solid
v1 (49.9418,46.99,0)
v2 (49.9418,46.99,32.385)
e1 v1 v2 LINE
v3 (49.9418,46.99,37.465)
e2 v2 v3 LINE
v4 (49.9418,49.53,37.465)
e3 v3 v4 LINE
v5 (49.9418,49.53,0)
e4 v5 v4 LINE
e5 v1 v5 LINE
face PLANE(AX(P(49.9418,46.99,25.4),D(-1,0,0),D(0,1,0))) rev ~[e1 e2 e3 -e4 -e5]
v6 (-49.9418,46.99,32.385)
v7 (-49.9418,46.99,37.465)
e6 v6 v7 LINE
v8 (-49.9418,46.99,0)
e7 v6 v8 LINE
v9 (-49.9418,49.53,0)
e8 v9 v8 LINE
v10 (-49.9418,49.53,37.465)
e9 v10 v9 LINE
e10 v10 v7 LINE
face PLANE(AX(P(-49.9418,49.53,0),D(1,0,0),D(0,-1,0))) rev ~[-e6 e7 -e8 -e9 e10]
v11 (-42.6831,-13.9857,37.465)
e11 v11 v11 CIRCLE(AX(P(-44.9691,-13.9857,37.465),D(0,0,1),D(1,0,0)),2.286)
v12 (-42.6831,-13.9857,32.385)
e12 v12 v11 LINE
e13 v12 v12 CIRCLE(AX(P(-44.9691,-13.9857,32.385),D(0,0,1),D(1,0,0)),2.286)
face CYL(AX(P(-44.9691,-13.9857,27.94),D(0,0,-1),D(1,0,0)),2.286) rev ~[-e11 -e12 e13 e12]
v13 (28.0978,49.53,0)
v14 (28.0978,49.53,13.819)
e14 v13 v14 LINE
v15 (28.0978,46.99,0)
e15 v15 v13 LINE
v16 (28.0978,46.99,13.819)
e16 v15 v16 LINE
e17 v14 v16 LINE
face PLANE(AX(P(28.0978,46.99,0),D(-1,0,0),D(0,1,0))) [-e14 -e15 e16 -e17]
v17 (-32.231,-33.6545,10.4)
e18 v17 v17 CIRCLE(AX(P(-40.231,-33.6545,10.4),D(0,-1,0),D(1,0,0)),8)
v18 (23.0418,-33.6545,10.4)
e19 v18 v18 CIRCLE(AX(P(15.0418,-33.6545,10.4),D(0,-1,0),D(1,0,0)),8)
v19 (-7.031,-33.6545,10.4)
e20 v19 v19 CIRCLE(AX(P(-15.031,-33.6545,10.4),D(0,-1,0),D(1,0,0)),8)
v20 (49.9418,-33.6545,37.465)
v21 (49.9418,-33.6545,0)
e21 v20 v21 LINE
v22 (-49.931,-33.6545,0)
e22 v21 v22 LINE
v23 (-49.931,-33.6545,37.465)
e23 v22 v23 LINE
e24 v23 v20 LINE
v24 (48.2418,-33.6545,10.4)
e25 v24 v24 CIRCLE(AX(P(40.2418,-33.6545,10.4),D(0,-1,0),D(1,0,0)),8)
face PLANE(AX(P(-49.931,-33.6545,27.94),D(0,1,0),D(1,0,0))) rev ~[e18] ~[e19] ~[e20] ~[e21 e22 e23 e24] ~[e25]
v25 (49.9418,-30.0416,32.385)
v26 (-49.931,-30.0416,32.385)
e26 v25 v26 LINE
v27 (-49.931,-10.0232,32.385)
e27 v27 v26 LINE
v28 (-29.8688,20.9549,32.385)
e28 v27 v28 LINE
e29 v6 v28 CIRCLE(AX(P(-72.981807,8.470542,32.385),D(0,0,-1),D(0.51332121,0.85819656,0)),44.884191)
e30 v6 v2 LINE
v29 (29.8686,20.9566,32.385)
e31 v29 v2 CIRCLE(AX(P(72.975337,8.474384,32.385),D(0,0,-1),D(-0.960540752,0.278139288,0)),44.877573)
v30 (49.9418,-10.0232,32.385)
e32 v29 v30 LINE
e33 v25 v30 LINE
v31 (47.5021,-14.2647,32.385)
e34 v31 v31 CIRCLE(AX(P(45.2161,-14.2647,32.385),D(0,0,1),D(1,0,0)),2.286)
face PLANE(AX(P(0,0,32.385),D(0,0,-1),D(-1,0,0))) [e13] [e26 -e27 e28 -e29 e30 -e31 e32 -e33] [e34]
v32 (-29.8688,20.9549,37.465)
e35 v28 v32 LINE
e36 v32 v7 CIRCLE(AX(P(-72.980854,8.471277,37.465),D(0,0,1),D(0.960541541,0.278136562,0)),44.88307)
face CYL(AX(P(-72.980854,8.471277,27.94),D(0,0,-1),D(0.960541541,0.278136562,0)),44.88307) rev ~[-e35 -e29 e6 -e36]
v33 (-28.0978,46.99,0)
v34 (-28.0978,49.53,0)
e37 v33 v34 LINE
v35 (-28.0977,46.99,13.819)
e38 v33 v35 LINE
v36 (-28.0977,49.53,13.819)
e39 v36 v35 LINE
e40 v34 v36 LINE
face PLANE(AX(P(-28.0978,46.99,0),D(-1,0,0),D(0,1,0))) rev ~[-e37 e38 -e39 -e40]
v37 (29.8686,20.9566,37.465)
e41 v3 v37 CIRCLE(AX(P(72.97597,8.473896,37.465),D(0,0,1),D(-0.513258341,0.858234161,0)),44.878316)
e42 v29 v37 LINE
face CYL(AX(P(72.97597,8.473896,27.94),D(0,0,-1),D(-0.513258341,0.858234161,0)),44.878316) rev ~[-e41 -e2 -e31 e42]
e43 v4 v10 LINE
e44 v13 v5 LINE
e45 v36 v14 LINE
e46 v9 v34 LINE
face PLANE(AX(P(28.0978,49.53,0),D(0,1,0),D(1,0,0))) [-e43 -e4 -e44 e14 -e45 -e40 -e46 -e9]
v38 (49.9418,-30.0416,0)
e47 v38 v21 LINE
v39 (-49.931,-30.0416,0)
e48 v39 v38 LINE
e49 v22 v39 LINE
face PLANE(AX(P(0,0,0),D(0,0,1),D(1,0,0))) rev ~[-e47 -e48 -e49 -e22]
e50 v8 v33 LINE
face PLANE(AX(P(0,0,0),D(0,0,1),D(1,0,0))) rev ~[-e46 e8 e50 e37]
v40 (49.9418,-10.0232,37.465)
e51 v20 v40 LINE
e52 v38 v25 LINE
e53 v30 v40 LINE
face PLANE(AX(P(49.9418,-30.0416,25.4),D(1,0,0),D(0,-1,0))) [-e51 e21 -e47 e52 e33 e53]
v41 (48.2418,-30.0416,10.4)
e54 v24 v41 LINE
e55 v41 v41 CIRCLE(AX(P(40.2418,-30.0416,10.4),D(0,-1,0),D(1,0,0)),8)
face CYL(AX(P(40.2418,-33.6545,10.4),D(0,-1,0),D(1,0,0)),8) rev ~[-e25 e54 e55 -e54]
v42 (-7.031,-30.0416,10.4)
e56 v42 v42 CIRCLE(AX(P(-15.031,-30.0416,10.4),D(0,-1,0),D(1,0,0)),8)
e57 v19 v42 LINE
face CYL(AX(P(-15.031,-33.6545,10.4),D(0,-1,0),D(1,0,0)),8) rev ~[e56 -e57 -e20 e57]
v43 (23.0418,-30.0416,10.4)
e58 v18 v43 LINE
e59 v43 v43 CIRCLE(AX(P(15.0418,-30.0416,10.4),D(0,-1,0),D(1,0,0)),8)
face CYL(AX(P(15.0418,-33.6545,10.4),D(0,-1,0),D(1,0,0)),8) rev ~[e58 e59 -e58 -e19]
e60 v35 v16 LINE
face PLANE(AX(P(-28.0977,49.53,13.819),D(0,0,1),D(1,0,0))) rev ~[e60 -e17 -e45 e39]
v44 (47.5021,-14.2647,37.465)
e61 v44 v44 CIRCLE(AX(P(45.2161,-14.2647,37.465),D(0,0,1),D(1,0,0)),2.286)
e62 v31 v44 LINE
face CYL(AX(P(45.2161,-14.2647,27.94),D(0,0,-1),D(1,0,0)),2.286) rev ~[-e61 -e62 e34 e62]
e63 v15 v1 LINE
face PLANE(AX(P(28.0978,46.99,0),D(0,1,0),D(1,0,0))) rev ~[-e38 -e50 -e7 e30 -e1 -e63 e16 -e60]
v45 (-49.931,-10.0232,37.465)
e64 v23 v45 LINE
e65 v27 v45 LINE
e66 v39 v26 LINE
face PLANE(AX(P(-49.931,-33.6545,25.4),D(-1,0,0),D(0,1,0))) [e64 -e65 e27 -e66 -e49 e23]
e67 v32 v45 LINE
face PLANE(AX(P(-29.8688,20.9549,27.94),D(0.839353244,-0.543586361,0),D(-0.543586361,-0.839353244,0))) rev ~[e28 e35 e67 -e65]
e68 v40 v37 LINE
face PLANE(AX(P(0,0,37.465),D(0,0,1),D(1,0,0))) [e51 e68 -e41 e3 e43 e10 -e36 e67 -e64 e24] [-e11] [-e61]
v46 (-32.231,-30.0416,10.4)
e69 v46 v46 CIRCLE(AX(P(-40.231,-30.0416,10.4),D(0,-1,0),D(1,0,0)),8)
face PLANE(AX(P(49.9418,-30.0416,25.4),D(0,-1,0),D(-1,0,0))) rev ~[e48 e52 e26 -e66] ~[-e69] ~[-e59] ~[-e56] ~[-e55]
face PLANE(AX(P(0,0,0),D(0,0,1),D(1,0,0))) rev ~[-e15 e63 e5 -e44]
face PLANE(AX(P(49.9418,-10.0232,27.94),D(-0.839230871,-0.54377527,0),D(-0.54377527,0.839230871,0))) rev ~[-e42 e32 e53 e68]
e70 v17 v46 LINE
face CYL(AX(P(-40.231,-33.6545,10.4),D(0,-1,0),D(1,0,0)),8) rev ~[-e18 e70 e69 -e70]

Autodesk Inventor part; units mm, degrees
ref_plane "YZ Plane" through (0, 0, 0) normal (1, 0, 0) x (0, 1, 0)
ref_plane "XZ Plane" through (0, 0, 0) normal (0, 1, 0) x (-1, 0, 0)
ref_plane "XY Plane" through (0, 0, 0) normal (0, 0, 1) x (1, 0, 0)
sketch "Sketch1" plane through (0, 0, 0) normal (0, 0, 1) x (1, 0, 0)
  line L0 (-28.0978, -20.8895) -> (-28.0978, -10.0232) projected
  line L1 (-49.931, -10.0232) -> (-28.0978, -10.0232) projected
  line L2 (-49.931, -33.6545) -> (-49.931, -10.0232) projected
  line L3 (49.9418, -33.6545) -> (-49.931, -33.6545) projected
  line L4 (49.9418, -10.0232) -> (49.9418, -33.6545) projected
  line L5 (28.0978, -10.0232) -> (49.9418, -10.0232) projected
  line L6 (28.0978, -10.0232) -> (28.0978, 46.99) projected
  line L7 (25.2422, 49.53) -> (25.2422, -14.986) projected
  line L8 (25.2422, -14.986) -> (28.0978, -14.986) projected
  line L9 (28.0978, -14.986) -> (28.0978, -20.8895) projected
  line L10 (28.0978, -20.8895) -> (-28.0978, -20.8895) projected
  line L11 (-28.0978, -16.51) -> (-28.0978, 49.53) projected
  line L12 (-28.0978, 49.53) -> (25.2422, 49.53) projected
  line L13 (49.9418, -33.6545) -> (-49.931, -33.6545)
  line L14 (-49.931, -33.6545) -> (-49.931, -30.0416)
  line L15 (-49.931, -30.0416) -> (49.9418, -30.0416)
  line L16 (49.9418, -30.0416) -> (49.9418, -33.6545)
  line L17 (49.9418, 46.99) -> (49.9418, 49.53) projected
  line L18 (28.0978, 49.53) -> (49.9418, 49.53) projected
  line L19 (28.0978, 46.99) -> (28.0978, 49.53) projected
  line L20 (28.0978, 46.99) -> (49.9418, 46.99) projected
  line L21 (-49.9418, 49.53) -> (-49.9418, 46.99) projected
  line L22 (-49.9418, 46.99) -> (-28.0978, 46.99) projected
  line L23 (-28.0978, 46.99) -> (-28.0978, 49.53) projected
  line L24 (-49.9418, 49.53) -> (-28.0978, 49.53) projected
  line L25 (49.9418, 46.99) -> (28.0978, 46.99)
  line L26 (28.0978, 46.99) -> (28.0978, 49.53)
  line L27 (28.0978, 49.53) -> (49.9418, 49.53)
  line L28 (49.9418, 49.53) -> (49.9418, 46.99)
  line L29 (-28.0978, 46.99) -> (-49.9418, 46.99)
  line L30 (-49.9418, 46.99) -> (-49.9418, 49.53)
  line L31 (-49.9418, 49.53) -> (-28.0978, 49.53)
  line L32 (-28.0978, 49.53) -> (-28.0978, 46.99)
  line L33 (28.0978, 46.99) -> (49.9418, 46.99) projected
  line L34 (49.9418, 46.99) -> (49.9418, 49.53) projected
  line L35 (49.9418, 49.53) -> (25.2422, 49.53) projected
  circle A0 centre (-44.9691, -13.9857) radius 2.286 projected
  circle A1 centre (45.2161, -14.2647) radius 2.286 projected
  point P0 (0, 0)
extrude "Extrusion1" add sketch "Sketch1" along normal blind 25.4 contours L22 L21 L24 L11 | L15 L4 L3 L2 | L18 L17 L20 L19
sketch "Sketch2" plane through (-49.931, -33.6545, 0) normal (0, -1, 0) x (1, 0, 0)
  circle A0 centre (9.7, 10.4) radius 8 projected
  circle A1 centre (34.9, 10.4) radius 8 projected
  circle A2 centre (64.9728, 10.4) radius 8 projected
  circle A3 centre (90.1728, 10.4) radius 8 projected
  circle A4 centre (9.7, 10.4) radius 8.128
  circle A5 centre (34.9, 10.4) radius 8.128
  circle A6 centre (64.9728, 10.4) radius 8.128
  circle A7 centre (90.1728, 10.4) radius 8.128
  point P0 (49.931, 0)
  dimension "d2" = 16.256
  dimension "d3" = 16.256
  dimension "d4" = 16.256
  dimension "d5" = 16.256
extrude "Extrusion2" cut sketch "Sketch2" against normal blind 25.4 contours A0 | A1 | A2 | A3
sketch "Sketch3" plane through (0, 0, 25.4) normal (0, 0, 1) x (1, 0, 0)
  line L0 (-49.931, -33.6545) -> (49.9418, -33.6545) projected
  line L1 (49.9418, -33.6545) -> (-49.931, -33.6545)
  line L2 (-28.0978, -20.8895) -> (-28.0978, -10.0232) projected
  line L3 (-49.931, -10.0232) -> (-28.0978, -10.0232) projected
  line L4 (-49.931, -33.6545) -> (-49.931, -10.0232) projected
  line L5 (49.9418, -33.6545) -> (-49.931, -33.6545) projected
  line L6 (49.9418, -10.0232) -> (49.9418, -33.6545) projected
  line L7 (28.0978, -10.0232) -> (49.9418, -10.0232) projected
  line L8 (28.0978, -10.0232) -> (28.0978, 46.99) projected
  line L9 (28.0978, 46.99) -> (49.9418, 46.99) projected
  line L10 (49.9418, 46.99) -> (49.9418, 49.53) projected
  line L11 (49.9418, 49.53) -> (25.2422, 49.53) projected
  line L12 (25.2422, 49.53) -> (25.2422, -14.986) projected
  line L13 (25.2422, -14.986) -> (28.0978, -14.986) projected
  line L14 (28.0978, -14.986) -> (28.0978, -20.8895) projected
  line L15 (28.0978, -20.8895) -> (-28.0978, -20.8895) projected
  line L16 (-28.0978, -16.51) -> (-28.0978, 49.53) projected
  line L17 (-28.0978, 49.53) -> (25.2422, 49.53) projected
  line L18 (-28.0978, 46.99) -> (-28.0978, 49.53) projected
  line L19 (-28.0978, 49.53) -> (-49.9418, 49.53) projected
  line L20 (-49.9418, 49.53) -> (-49.9418, 46.99) projected
  line L21 (-49.9418, 46.99) -> (-28.0978, 46.99) projected
  line L22 (-49.9418, 49.53) -> (-49.9418, 46.99) projected
  line L23 (-49.9418, 46.99) -> (-49.9418, 49.53)
  line L24 (-49.9418, 49.53) -> (49.9418, 49.53)
  line L25 (49.9418, 49.53) -> (49.9418, 46.99)
  line L26 (49.9418, -30.0416) -> (-49.931, -30.0416) projected
  line L27 (-49.931, -33.6545) -> (-49.931, -30.0416)
  line L28 (49.9418, -33.6545) -> (49.9418, -30.0416)
  line L29 (49.9418, -30.0416) -> (-49.931, -30.0416) projected
  arc A0 (-49.931, -30.0416) -> (-49.9418, 46.99) centre (-72.9814, 8.471) ccw
  arc A1 (49.9418, 46.99) -> (49.9418, -30.0416) centre (72.9757, 8.4742) ccw
  point P0 (0, 0)
extrude "Extrusion3" add sketch "Sketch3" along normal blind 2.54
sketch "Sketch4" plane through (0, 0, 27.94) normal (0, 0, 1) x (1, 0, 0)
  line L0 (49.9418, -33.6545) -> (49.9418, -10.0232) projected
  line L1 (49.9418, -10.0232) -> (32.0871, -10.0232) projected
  arc A0 (49.9418, 46.99) -> (32.0871, -10.0232) centre (72.9757, 8.4742) ccw projected
  line L2 (49.9418, 46.99) -> (49.9418, 49.53) projected
  line L3 (49.9418, 49.53) -> (-49.9418, 49.53) projected
  line L4 (-49.9418, 49.53) -> (-49.9418, 46.99) projected
  arc A1 (-32.0851, -10.0232) -> (-49.9418, 46.99) centre (-72.9814, 8.471) ccw projected
  line L5 (-32.0851, -10.0232) -> (-49.931, -10.0232) projected
  line L6 (-49.931, -10.0232) -> (-49.931, -33.6545) projected
  line L7 (-49.931, -33.6545) -> (49.9418, -33.6545) projected
  line L8 (-46.121, -28.5371) -> (-46.121, -11.9877) projected
  line L9 (46.1318, -11.9877) -> (46.1318, -28.5371) projected
  line L10 (-28.0978, -16.51) -> (-28.0978, 49.53) projected
  line L11 (28.0978, -10.0232) -> (28.0978, 46.99) projected
  line L12 (-46.121, -28.5371) -> (46.1318, -28.5371)
  line L13 (46.1318, -28.5371) -> (46.1318, -11.9877)
  line L14 (46.1318, -11.9877) -> (-46.121, -11.9877)
  line L15 (-46.121, -11.9877) -> (-46.121, -28.5371)
  line L16 (-28.0978, -11.9877) -> (28.0978, -11.9877)
  line L17 (28.0978, -11.9877) -> (28.0978, -6.5147)
  line L18 (28.0978, -6.5147) -> (-28.0978, -6.5147)
  line L19 (-28.0978, -6.5147) -> (-28.0978, -11.9877)
  line L20 (-28.0978, 23.6896) -> (28.0978, 23.6896)
  line L21 (28.0978, 23.6896) -> (28.0978, 29.0198)
  line L22 (28.0978, 29.0198) -> (-28.0978, 29.0198)
  line L23 (-28.0978, 29.0198) -> (-28.0978, 23.6896)
  line L24 (-28.0978, 32.3759) -> (28.0978, 32.3759)
  line L25 (28.0978, 32.3759) -> (28.0978, 44.8129)
  line L26 (28.0978, 44.8129) -> (-28.0978, 44.8129)
  line L27 (-28.0978, 44.8129) -> (-28.0978, 32.3759)
  point P0 (0, 0)
extrude "Extrusion4" cut sketch "Sketch4" against normal blind 2.54 contours L11 L17 L14 L10 L18 | L20 L10 L22 L11 | L14 L9 L12 L8 | L24 L10 L26 L11
sketch "Sketch5" plane through (28.0978, 49.53, 0) normal (0, 1, 0) x (1, 0, 0)
  line L0 (0, -25.4) -> (21.844, -25.4) projected
  line L1 (-56.1955, 0) -> (-56.1955, -25.4) projected
  line L2 (0, -25.4) -> (-56.1955, -25.4)
  line L3 (-56.1955, -25.4) -> (-56.1955, -13.819)
  line L4 (-56.1955, -13.819) -> (0, -13.819)
  line L5 (0, -13.819) -> (0, -25.4)
  point P0 (-28.0978, 0)
extrude "Extrusion5" add sketch "Sketch5" against normal blind 2.54
sketch "Sketch6" plane through (0, 0, 27.94) normal (0, 0, 1) x (1, 0, 0)
  line L0 (46.1318, -28.5371) -> (-46.121, -28.5371) projected
  line L1 (-46.121, -11.9877) -> (-46.121, -28.5371) projected
  line L2 (28.0978, -10.0232) -> (49.9418, -10.0232) projected
  line L3 (28.0978, -11.9877) -> (46.1318, -11.9877) projected
  line L4 (28.0978, -6.5147) -> (28.0978, -11.9877) projected
  line L5 (46.1318, -28.5371) -> (46.1318, -11.9877) projected
  line L6 (46.1318, -28.5371) -> (46.1318, -11.9877) construction
  line L7 (46.1318, -11.9877) -> (28.0978, -11.9877) projected
  line L8 (46.1318, -11.9877) -> (28.0978, -11.9877) construction
  spline S0 degree 2 poles (46.1318, -28.5371) (46.1318, -11.9877) (28.0978, -11.9877) knots 1 1 1 2 2 2
  line L9 (-46.121, -28.5371) -> (-46.121, -11.9877)
  line L10 (-28.0978, -11.9877) -> (-46.121, -11.9877) projected
  line L11 (-46.121, -11.9877) -> (-28.0978, -11.9877)
  line L12 (46.1318, -28.5371) -> (46.1318, -11.9877)
  line L13 (46.1318, -11.9877) -> (28.0978, -11.9877)
  line L14 (-46.121, -11.9877) -> (-28.0978, -11.9877) projected
  line L15 (-28.0978, -11.9877) -> (-46.121, -11.9877)
  line L16 (-46.121, -11.9877) -> (-46.121, -28.5371)
  line L17 (-46.121, -28.5371) -> (-46.121, -11.9877) construction
  line L18 (-32.231, -33.6545) -> (-48.231, -33.6545) projected
  line L19 (-46.121, -11.9877) -> (-28.0978, -11.9877) construction
  spline S1 degree 2 poles (-46.121, -28.5371) (-46.121, -11.9877) (-28.0978, -11.9877) knots 1 1 1 2 2 2
  point P0 (0, 0)
extrude "Extrusion6" add sketch "Sketch6" against normal blind 2.54
sketch "Sketch7" plane through (0, 0, 27.94) normal (0, 0, 1) x (1, 0, 0)
  line L0 (-28.0978, -11.9877) -> (-28.0978, -6.5147) projected
  line L1 (-28.0978, -11.9877) -> (0, -6.5147)
  line L2 (0, -6.5147) -> (28.0978, -11.9877)
  line L3 (28.0978, -11.9877) -> (28.0978, -6.5147)
  line L4 (-28.0978, -6.5147) -> (28.0978, -6.5147) projected
  line L5 (28.0978, -6.5147) -> (-28.0978, -6.5147)
  line L6 (-28.0978, -6.5147) -> (-28.0978, -11.9877)
  line L7 (0, -6.5147) -> (28.0978, -11.9877)
  line L8 (-28.0978, -11.9877) -> (-46.121, -11.9877) projected
  line L9 (-28.0978, -11.9877) -> (0, -6.5147)
  line L10 (-28.0978, -11.9877) -> (0, -6.5147)
  line L11 (0, -6.5147) -> (-28.0978, -6.5147)
  line L12 (-28.0978, -6.5147) -> (-28.0978, -11.9877)
  line L13 (0, -6.5147) -> (28.0978, -6.5147)
  line L14 (28.0978, -6.5147) -> (28.0978, -11.9877)
  line L15 (28.0978, -11.9877) -> (0, -6.5147)
  point P0 (0, 0)
extrude "Extrusion7" add sketch "Sketch7" against normal blind 2.54
sketch "Sketch8" plane through (0, 0, 27.94) normal (0, 0, 1) x (1, 0, 0)
  line L0 (-32.0851, -10.0232) -> (-49.931, -10.0232) projected
  line L1 (28.0978, 23.6896) -> (-28.0978, 23.6896) projected
  line L2 (-49.931, -10.0232) -> (-28.0978, 23.6896)
  line L3 (-28.0978, 23.6896) -> (28.0978, 23.6896)
  line L4 (49.9418, -10.0232) -> (32.0871, -10.0232) projected
  line L5 (28.0978, 23.6896) -> (49.9418, -10.0232)
  line L6 (49.9418, -10.0232) -> (32.0871, -10.0232)
  line L7 (0, -6.5147) -> (-28.0978, -11.9877) projected
  line L8 (32.0871, -10.0232) -> (0, -6.5147)
  line L9 (28.0978, 44.8129) -> (28.0978, 32.3759) projected
  line L10 (28.0978, 32.3759) -> (-28.0978, 32.3759) projected
  line L11 (-28.0978, 32.3759) -> (-28.0978, 44.8129) projected
  line L12 (-28.0978, 44.8129) -> (28.0978, 44.8129) projected
  line L13 (28.0978, 29.0198) -> (28.0978, 23.6896) projected
  line L14 (28.0978, 23.6896) -> (-28.0978, 23.6896) projected
  line L15 (-28.0978, 23.6896) -> (-28.0978, 29.0198) projected
  line L16 (-28.0978, 29.0198) -> (28.0978, 29.0198) projected
  line L17 (46.1318, -28.5371) -> (-46.121, -28.5371) projected
  line L18 (-28.0978, -11.9877) -> (0, -6.5147) projected
  line L19 (0, -6.5147) -> (28.0978, -11.9877) projected
  line L20 (49.9418, -33.6545) -> (49.9418, -10.0232) projected
  line L21 (49.9418, -10.0232) -> (32.0871, -10.0232) projected
  arc A0 (49.9418, 46.99) -> (32.0871, -10.0232) centre (72.9757, 8.4742) ccw projected
  line L22 (49.9418, 46.99) -> (49.9418, 49.53) projected
  line L23 (49.9418, 49.53) -> (-49.9418, 49.53) projected
  line L24 (-49.9418, 49.53) -> (-49.9418, 46.99) projected
  arc A1 (-32.0851, -10.0232) -> (-49.9418, 46.99) centre (-72.9814, 8.471) ccw projected
  line L25 (-32.0851, -10.0232) -> (-49.931, -10.0232) projected
  line L26 (-49.931, -10.0232) -> (-49.931, -33.6545) projected
  line L27 (-49.931, -33.6545) -> (49.9418, -33.6545) projected
  line L28 (0, -6.5147) -> (-32.0851, -10.0232)
  line L29 (-49.931, -10.0232) -> (-32.0851, -10.0232)
  line L30 (-49.931, -10.0232) -> (-28.0978, 23.6896)
  line L31 (-28.0978, 29.0198) -> (-28.0978, 23.6896) projected
  line L32 (-28.0978, 23.6896) -> (28.0978, 23.6896)
  line L33 (28.0978, 23.6896) -> (49.9418, -10.0232)
  line L34 (49.9418, -30.0416) -> (49.9418, -10.0232) projected
  line L35 (49.9418, -10.0232) -> (32.0871, -10.0232)
  line L36 (32.0871, -10.0232) -> (0, -6.5147)
  line L37 (-32.0851, -10.0232) -> (-49.931, -10.0232)
  point P0 (0, 0)
extrude "Extrusion8" add sketch "Sketch8" against normal blind 2.54 contours L0 L2 A1 | A1 L2 L1 L5 A0 L8 L28 | A0 L5 L4
sketch "Sketch9" plane through (0, 0, 27.94) normal (0, 0, 1) x (1, 0, 0)
  line L0 (0, -6.5147) -> (-28.0978, -11.9877) projected
  line L1 (0, -6.5147) -> (28.0978, -11.9877) projected
  line L2 (-28.0978, -11.9877) -> (28.0978, -11.9877)
  line L3 (28.0978, -11.9877) -> (8.8321, -8.235)
  line L4 (28.0978, -11.9877) -> (0, -6.5147)
  line L5 (-28.0978, -11.9877) -> (0, -6.5147)
  point P0 (0, 0)
extrude "Extrusion9" add sketch "Sketch9" against normal blind 2.54
sketch "Sketch10" plane through (0, 0, 27.94) normal (0, 0, 1) x (1, 0, 0)
  line L0 (28.0978, -11.9877) -> (-28.0978, -11.9877) construction
  line L1 (-46.121, -28.5371) -> (-28.0978, -11.9877) construction
  line L2 (-49.931, -10.0232) -> (-49.931, -30.0416) construction
  line L3 (-28.0978, -11.9877) -> (-49.931, -10.0232) construction
  line L4 (-49.931, -10.0232) -> (-37.1094, -20.2624) construction
  line L5 (46.1318, -28.5371) -> (30.9358, -11.9877) construction
  line L6 (29.8686, 20.9566) -> (49.9418, -10.0232) construction
  line L7 (30.9358, -11.9877) -> (49.9418, -10.0232) construction
  line L8 (-29.8688, 20.9549) -> (-49.931, -10.0232) construction
  line L9 (-49.931, -10.0232) -> (-44.9691, -13.9857) construction
  line L10 (-49.931, -10.0232) -> (-43.581, -10.0232) construction
  line L11 (49.9418, -10.0232) -> (38.5338, -20.2624) construction
  line L12 (49.9418, -10.0232) -> (45.2161, -14.2647) construction
  line L13 (49.9418, -10.0232) -> (56.2918, -10.0232) construction
  circle A0 centre (-44.9691, -13.9857) radius 2.286
  circle A1 centre (45.2161, -14.2647) radius 2.286
  point P0 (0, 0)
  dimension "d22" = 6.35
  dimension "d23" = 38.61
  dimension "d24" = 6.35
  dimension "d25" = 138.09
  dimension "d26" = 4.572
  dimension "d27" = 4.572
extrude "Extrusion10" cut sketch "Sketch10" against normal blind 2.54
sketch "Sketch11" plane through (0, 0, 27.94) normal (0, 0, 1) x (1, 0, 0)
  circle A0 centre (-44.9691, -13.9857) radius 2.286 projected
  circle A1 centre (45.2161, -14.2647) radius 2.286 projected
  line L0 (46.1318, -28.5371) -> (-46.121, -28.5371) projected
  line L1 (-28.0978, -11.9877) -> (28.0978, -11.9877) projected
  line L2 (28.0978, 44.8129) -> (28.0978, 32.3759) projected
  line L3 (28.0978, 32.3759) -> (-28.0978, 32.3759) projected
  line L4 (-28.0978, 32.3759) -> (-28.0978, 44.8129) projected
  line L5 (-28.0978, 44.8129) -> (28.0978, 44.8129) projected
  line L6 (28.0978, 23.6896) -> (-28.0978, 23.6896) projected
  line L7 (-28.0978, 23.6896) -> (-28.0978, 29.0198) projected
  line L8 (-28.0978, 29.0198) -> (28.0978, 29.0198) projected
  line L9 (28.0978, 29.0198) -> (28.0978, 23.6896) projected
  arc A2 (49.9418, 46.99) -> (29.8686, 20.9566) centre (72.9757, 8.4742) ccw projected
  line L10 (49.9418, 46.99) -> (49.9418, 49.53) projected
  line L11 (49.9418, 49.53) -> (-49.9418, 49.53) projected
  line L12 (-49.9418, 49.53) -> (-49.9418, 46.99) projected
  arc A3 (-29.8688, 20.9549) -> (-49.9418, 46.99) centre (-72.9814, 8.471) ccw projected
  line L13 (-29.8688, 20.9549) -> (-49.931, -10.0232) projected
  line L14 (-49.931, -10.0232) -> (-49.931, -33.6545) projected
  line L15 (-49.931, -33.6545) -> (49.9418, -33.6545) projected
  line L16 (49.9418, -33.6545) -> (49.9418, -10.0232) projected
  line L17 (49.9418, -10.0232) -> (29.8686, 20.9566) projected
  line L18 (49.9418, -33.6545) -> (-49.931, -33.6545)
  line L19 (-49.931, -10.0232) -> (-49.931, -30.0416) projected
  line L20 (-49.931, -10.0232) -> (-29.8688, 20.9549)
  arc A4 (-29.8688, 20.9549) -> (-49.9418, 46.99) centre (-72.9814, 8.471) ccw
  line L21 (-49.9418, 46.99) -> (49.9418, 46.99) projected
  line L22 (-49.9418, 46.99) -> (-49.9418, 49.53)
  line L23 (49.9418, 49.53) -> (28.0978, 49.53) projected
  line L24 (-49.9418, 49.53) -> (49.9418, 49.53)
  line L25 (49.9418, 49.53) -> (49.9418, 46.99)
  line L26 (49.9418, -10.0232) -> (29.8686, 20.9566) projected
  arc A5 (49.9418, 46.99) -> (29.8686, 20.9566) centre (72.9757, 8.4742) ccw
  line L27 (29.8686, 20.9566) -> (49.9418, -10.0232)
  point P0 (0, 0)
extrude "Extrusion11" add sketch "Sketch11" along normal blind 9.525 contours L2 L3 L4 L5 | L6 L7 L8 L9 | L21 L12 L11 L10 | A2 L17 L16 L15 L14 L13 A3 L21
sketch "Sketch12" plane through (0, 0, 25.4) normal (0, 0, -1) x (-1, 0, 0)
  circle A0 centre (44.9691, -13.9857) radius 2.286 projected
  circle A1 centre (-45.2161, -14.2647) radius 2.286 projected
  line L0 (46.121, -28.5371) -> (-46.1318, -28.5371) projected
  line L1 (-28.0978, -11.9877) -> (28.0978, -11.9877) projected
  line L2 (-28.0978, 32.3759) -> (-28.0978, 44.8129) projected
  line L3 (-28.0978, 44.8129) -> (28.0978, 44.8129) projected
  line L4 (28.0978, 44.8129) -> (28.0978, 32.3759) projected
  line L5 (28.0978, 32.3759) -> (-28.0978, 32.3759) projected
  line L6 (28.0978, 23.6896) -> (-28.0978, 23.6896) projected
  line L7 (-28.0978, 23.6896) -> (-28.0978, 29.0198) projected
  line L8 (-28.0978, 29.0198) -> (28.0978, 29.0198) projected
  line L9 (28.0978, 29.0198) -> (28.0978, 23.6896) projected
  arc A2 (49.9418, 46.99) -> (29.8688, 20.9549) centre (72.9814, 8.471) ccw projected
  line L10 (49.9418, 46.99) -> (-49.9418, 46.99) projected
  arc A3 (-29.8686, 20.9566) -> (-49.9418, 46.99) centre (-72.9757, 8.4742) ccw projected
  line L11 (-29.8686, 20.9566) -> (-49.9418, -10.0232) projected
  line L12 (-49.9418, -30.0416) -> (-49.9418, -10.0232) projected
  line L13 (-49.9418, -30.0416) -> (49.931, -30.0416) projected
  line L14 (49.931, -10.0232) -> (49.931, -30.0416) projected
  line L15 (49.931, -10.0232) -> (29.8688, 20.9549) projected
  line L16 (49.931, -30.0416) -> (-49.9418, -30.0416)
  line L17 (-49.9418, -30.0416) -> (-49.9418, -10.0232) projected
  line L18 (-49.9418, -10.0232) -> (-29.8686, 20.9566)
  arc A4 (-29.8686, 20.9566) -> (-49.9418, 46.99) centre (-72.9757, 8.4742) ccw projected
  line L19 (49.931, -10.0232) -> (49.931, -30.0416)
  line L20 (49.931, -10.0232) -> (49.931, -33.6545) projected
  line L21 (29.8688, 20.9549) -> (49.931, -10.0232) projected
  line L22 (49.931, -10.0232) -> (29.8688, 20.9549)
  line L23 (49.9418, 46.99) -> (-49.9418, 46.99)
  line L24 (-49.9418, -10.0232) -> (-49.9418, -30.0416)
  line L25 (-28.0978, 46.99) -> (-49.9418, 46.99) projected
  arc A5 (-29.8686, 20.9566) -> (-49.9418, 46.99) centre (-72.9757, 8.4742) ccw
  arc A6 (49.9418, 46.99) -> (29.8688, 20.9549) centre (72.9814, 8.471) ccw
  point P0 (0, 0)
extrude "Extrusion12" cut sketch "Sketch12" against normal blind 6.985 contours L2 L3 L4 L5 | L6 L7 L8 L9 | A2 L15 L14 L13 L12 L11 A3 L10
properties part number "Chasis_top" material "PAEK Plastic"
